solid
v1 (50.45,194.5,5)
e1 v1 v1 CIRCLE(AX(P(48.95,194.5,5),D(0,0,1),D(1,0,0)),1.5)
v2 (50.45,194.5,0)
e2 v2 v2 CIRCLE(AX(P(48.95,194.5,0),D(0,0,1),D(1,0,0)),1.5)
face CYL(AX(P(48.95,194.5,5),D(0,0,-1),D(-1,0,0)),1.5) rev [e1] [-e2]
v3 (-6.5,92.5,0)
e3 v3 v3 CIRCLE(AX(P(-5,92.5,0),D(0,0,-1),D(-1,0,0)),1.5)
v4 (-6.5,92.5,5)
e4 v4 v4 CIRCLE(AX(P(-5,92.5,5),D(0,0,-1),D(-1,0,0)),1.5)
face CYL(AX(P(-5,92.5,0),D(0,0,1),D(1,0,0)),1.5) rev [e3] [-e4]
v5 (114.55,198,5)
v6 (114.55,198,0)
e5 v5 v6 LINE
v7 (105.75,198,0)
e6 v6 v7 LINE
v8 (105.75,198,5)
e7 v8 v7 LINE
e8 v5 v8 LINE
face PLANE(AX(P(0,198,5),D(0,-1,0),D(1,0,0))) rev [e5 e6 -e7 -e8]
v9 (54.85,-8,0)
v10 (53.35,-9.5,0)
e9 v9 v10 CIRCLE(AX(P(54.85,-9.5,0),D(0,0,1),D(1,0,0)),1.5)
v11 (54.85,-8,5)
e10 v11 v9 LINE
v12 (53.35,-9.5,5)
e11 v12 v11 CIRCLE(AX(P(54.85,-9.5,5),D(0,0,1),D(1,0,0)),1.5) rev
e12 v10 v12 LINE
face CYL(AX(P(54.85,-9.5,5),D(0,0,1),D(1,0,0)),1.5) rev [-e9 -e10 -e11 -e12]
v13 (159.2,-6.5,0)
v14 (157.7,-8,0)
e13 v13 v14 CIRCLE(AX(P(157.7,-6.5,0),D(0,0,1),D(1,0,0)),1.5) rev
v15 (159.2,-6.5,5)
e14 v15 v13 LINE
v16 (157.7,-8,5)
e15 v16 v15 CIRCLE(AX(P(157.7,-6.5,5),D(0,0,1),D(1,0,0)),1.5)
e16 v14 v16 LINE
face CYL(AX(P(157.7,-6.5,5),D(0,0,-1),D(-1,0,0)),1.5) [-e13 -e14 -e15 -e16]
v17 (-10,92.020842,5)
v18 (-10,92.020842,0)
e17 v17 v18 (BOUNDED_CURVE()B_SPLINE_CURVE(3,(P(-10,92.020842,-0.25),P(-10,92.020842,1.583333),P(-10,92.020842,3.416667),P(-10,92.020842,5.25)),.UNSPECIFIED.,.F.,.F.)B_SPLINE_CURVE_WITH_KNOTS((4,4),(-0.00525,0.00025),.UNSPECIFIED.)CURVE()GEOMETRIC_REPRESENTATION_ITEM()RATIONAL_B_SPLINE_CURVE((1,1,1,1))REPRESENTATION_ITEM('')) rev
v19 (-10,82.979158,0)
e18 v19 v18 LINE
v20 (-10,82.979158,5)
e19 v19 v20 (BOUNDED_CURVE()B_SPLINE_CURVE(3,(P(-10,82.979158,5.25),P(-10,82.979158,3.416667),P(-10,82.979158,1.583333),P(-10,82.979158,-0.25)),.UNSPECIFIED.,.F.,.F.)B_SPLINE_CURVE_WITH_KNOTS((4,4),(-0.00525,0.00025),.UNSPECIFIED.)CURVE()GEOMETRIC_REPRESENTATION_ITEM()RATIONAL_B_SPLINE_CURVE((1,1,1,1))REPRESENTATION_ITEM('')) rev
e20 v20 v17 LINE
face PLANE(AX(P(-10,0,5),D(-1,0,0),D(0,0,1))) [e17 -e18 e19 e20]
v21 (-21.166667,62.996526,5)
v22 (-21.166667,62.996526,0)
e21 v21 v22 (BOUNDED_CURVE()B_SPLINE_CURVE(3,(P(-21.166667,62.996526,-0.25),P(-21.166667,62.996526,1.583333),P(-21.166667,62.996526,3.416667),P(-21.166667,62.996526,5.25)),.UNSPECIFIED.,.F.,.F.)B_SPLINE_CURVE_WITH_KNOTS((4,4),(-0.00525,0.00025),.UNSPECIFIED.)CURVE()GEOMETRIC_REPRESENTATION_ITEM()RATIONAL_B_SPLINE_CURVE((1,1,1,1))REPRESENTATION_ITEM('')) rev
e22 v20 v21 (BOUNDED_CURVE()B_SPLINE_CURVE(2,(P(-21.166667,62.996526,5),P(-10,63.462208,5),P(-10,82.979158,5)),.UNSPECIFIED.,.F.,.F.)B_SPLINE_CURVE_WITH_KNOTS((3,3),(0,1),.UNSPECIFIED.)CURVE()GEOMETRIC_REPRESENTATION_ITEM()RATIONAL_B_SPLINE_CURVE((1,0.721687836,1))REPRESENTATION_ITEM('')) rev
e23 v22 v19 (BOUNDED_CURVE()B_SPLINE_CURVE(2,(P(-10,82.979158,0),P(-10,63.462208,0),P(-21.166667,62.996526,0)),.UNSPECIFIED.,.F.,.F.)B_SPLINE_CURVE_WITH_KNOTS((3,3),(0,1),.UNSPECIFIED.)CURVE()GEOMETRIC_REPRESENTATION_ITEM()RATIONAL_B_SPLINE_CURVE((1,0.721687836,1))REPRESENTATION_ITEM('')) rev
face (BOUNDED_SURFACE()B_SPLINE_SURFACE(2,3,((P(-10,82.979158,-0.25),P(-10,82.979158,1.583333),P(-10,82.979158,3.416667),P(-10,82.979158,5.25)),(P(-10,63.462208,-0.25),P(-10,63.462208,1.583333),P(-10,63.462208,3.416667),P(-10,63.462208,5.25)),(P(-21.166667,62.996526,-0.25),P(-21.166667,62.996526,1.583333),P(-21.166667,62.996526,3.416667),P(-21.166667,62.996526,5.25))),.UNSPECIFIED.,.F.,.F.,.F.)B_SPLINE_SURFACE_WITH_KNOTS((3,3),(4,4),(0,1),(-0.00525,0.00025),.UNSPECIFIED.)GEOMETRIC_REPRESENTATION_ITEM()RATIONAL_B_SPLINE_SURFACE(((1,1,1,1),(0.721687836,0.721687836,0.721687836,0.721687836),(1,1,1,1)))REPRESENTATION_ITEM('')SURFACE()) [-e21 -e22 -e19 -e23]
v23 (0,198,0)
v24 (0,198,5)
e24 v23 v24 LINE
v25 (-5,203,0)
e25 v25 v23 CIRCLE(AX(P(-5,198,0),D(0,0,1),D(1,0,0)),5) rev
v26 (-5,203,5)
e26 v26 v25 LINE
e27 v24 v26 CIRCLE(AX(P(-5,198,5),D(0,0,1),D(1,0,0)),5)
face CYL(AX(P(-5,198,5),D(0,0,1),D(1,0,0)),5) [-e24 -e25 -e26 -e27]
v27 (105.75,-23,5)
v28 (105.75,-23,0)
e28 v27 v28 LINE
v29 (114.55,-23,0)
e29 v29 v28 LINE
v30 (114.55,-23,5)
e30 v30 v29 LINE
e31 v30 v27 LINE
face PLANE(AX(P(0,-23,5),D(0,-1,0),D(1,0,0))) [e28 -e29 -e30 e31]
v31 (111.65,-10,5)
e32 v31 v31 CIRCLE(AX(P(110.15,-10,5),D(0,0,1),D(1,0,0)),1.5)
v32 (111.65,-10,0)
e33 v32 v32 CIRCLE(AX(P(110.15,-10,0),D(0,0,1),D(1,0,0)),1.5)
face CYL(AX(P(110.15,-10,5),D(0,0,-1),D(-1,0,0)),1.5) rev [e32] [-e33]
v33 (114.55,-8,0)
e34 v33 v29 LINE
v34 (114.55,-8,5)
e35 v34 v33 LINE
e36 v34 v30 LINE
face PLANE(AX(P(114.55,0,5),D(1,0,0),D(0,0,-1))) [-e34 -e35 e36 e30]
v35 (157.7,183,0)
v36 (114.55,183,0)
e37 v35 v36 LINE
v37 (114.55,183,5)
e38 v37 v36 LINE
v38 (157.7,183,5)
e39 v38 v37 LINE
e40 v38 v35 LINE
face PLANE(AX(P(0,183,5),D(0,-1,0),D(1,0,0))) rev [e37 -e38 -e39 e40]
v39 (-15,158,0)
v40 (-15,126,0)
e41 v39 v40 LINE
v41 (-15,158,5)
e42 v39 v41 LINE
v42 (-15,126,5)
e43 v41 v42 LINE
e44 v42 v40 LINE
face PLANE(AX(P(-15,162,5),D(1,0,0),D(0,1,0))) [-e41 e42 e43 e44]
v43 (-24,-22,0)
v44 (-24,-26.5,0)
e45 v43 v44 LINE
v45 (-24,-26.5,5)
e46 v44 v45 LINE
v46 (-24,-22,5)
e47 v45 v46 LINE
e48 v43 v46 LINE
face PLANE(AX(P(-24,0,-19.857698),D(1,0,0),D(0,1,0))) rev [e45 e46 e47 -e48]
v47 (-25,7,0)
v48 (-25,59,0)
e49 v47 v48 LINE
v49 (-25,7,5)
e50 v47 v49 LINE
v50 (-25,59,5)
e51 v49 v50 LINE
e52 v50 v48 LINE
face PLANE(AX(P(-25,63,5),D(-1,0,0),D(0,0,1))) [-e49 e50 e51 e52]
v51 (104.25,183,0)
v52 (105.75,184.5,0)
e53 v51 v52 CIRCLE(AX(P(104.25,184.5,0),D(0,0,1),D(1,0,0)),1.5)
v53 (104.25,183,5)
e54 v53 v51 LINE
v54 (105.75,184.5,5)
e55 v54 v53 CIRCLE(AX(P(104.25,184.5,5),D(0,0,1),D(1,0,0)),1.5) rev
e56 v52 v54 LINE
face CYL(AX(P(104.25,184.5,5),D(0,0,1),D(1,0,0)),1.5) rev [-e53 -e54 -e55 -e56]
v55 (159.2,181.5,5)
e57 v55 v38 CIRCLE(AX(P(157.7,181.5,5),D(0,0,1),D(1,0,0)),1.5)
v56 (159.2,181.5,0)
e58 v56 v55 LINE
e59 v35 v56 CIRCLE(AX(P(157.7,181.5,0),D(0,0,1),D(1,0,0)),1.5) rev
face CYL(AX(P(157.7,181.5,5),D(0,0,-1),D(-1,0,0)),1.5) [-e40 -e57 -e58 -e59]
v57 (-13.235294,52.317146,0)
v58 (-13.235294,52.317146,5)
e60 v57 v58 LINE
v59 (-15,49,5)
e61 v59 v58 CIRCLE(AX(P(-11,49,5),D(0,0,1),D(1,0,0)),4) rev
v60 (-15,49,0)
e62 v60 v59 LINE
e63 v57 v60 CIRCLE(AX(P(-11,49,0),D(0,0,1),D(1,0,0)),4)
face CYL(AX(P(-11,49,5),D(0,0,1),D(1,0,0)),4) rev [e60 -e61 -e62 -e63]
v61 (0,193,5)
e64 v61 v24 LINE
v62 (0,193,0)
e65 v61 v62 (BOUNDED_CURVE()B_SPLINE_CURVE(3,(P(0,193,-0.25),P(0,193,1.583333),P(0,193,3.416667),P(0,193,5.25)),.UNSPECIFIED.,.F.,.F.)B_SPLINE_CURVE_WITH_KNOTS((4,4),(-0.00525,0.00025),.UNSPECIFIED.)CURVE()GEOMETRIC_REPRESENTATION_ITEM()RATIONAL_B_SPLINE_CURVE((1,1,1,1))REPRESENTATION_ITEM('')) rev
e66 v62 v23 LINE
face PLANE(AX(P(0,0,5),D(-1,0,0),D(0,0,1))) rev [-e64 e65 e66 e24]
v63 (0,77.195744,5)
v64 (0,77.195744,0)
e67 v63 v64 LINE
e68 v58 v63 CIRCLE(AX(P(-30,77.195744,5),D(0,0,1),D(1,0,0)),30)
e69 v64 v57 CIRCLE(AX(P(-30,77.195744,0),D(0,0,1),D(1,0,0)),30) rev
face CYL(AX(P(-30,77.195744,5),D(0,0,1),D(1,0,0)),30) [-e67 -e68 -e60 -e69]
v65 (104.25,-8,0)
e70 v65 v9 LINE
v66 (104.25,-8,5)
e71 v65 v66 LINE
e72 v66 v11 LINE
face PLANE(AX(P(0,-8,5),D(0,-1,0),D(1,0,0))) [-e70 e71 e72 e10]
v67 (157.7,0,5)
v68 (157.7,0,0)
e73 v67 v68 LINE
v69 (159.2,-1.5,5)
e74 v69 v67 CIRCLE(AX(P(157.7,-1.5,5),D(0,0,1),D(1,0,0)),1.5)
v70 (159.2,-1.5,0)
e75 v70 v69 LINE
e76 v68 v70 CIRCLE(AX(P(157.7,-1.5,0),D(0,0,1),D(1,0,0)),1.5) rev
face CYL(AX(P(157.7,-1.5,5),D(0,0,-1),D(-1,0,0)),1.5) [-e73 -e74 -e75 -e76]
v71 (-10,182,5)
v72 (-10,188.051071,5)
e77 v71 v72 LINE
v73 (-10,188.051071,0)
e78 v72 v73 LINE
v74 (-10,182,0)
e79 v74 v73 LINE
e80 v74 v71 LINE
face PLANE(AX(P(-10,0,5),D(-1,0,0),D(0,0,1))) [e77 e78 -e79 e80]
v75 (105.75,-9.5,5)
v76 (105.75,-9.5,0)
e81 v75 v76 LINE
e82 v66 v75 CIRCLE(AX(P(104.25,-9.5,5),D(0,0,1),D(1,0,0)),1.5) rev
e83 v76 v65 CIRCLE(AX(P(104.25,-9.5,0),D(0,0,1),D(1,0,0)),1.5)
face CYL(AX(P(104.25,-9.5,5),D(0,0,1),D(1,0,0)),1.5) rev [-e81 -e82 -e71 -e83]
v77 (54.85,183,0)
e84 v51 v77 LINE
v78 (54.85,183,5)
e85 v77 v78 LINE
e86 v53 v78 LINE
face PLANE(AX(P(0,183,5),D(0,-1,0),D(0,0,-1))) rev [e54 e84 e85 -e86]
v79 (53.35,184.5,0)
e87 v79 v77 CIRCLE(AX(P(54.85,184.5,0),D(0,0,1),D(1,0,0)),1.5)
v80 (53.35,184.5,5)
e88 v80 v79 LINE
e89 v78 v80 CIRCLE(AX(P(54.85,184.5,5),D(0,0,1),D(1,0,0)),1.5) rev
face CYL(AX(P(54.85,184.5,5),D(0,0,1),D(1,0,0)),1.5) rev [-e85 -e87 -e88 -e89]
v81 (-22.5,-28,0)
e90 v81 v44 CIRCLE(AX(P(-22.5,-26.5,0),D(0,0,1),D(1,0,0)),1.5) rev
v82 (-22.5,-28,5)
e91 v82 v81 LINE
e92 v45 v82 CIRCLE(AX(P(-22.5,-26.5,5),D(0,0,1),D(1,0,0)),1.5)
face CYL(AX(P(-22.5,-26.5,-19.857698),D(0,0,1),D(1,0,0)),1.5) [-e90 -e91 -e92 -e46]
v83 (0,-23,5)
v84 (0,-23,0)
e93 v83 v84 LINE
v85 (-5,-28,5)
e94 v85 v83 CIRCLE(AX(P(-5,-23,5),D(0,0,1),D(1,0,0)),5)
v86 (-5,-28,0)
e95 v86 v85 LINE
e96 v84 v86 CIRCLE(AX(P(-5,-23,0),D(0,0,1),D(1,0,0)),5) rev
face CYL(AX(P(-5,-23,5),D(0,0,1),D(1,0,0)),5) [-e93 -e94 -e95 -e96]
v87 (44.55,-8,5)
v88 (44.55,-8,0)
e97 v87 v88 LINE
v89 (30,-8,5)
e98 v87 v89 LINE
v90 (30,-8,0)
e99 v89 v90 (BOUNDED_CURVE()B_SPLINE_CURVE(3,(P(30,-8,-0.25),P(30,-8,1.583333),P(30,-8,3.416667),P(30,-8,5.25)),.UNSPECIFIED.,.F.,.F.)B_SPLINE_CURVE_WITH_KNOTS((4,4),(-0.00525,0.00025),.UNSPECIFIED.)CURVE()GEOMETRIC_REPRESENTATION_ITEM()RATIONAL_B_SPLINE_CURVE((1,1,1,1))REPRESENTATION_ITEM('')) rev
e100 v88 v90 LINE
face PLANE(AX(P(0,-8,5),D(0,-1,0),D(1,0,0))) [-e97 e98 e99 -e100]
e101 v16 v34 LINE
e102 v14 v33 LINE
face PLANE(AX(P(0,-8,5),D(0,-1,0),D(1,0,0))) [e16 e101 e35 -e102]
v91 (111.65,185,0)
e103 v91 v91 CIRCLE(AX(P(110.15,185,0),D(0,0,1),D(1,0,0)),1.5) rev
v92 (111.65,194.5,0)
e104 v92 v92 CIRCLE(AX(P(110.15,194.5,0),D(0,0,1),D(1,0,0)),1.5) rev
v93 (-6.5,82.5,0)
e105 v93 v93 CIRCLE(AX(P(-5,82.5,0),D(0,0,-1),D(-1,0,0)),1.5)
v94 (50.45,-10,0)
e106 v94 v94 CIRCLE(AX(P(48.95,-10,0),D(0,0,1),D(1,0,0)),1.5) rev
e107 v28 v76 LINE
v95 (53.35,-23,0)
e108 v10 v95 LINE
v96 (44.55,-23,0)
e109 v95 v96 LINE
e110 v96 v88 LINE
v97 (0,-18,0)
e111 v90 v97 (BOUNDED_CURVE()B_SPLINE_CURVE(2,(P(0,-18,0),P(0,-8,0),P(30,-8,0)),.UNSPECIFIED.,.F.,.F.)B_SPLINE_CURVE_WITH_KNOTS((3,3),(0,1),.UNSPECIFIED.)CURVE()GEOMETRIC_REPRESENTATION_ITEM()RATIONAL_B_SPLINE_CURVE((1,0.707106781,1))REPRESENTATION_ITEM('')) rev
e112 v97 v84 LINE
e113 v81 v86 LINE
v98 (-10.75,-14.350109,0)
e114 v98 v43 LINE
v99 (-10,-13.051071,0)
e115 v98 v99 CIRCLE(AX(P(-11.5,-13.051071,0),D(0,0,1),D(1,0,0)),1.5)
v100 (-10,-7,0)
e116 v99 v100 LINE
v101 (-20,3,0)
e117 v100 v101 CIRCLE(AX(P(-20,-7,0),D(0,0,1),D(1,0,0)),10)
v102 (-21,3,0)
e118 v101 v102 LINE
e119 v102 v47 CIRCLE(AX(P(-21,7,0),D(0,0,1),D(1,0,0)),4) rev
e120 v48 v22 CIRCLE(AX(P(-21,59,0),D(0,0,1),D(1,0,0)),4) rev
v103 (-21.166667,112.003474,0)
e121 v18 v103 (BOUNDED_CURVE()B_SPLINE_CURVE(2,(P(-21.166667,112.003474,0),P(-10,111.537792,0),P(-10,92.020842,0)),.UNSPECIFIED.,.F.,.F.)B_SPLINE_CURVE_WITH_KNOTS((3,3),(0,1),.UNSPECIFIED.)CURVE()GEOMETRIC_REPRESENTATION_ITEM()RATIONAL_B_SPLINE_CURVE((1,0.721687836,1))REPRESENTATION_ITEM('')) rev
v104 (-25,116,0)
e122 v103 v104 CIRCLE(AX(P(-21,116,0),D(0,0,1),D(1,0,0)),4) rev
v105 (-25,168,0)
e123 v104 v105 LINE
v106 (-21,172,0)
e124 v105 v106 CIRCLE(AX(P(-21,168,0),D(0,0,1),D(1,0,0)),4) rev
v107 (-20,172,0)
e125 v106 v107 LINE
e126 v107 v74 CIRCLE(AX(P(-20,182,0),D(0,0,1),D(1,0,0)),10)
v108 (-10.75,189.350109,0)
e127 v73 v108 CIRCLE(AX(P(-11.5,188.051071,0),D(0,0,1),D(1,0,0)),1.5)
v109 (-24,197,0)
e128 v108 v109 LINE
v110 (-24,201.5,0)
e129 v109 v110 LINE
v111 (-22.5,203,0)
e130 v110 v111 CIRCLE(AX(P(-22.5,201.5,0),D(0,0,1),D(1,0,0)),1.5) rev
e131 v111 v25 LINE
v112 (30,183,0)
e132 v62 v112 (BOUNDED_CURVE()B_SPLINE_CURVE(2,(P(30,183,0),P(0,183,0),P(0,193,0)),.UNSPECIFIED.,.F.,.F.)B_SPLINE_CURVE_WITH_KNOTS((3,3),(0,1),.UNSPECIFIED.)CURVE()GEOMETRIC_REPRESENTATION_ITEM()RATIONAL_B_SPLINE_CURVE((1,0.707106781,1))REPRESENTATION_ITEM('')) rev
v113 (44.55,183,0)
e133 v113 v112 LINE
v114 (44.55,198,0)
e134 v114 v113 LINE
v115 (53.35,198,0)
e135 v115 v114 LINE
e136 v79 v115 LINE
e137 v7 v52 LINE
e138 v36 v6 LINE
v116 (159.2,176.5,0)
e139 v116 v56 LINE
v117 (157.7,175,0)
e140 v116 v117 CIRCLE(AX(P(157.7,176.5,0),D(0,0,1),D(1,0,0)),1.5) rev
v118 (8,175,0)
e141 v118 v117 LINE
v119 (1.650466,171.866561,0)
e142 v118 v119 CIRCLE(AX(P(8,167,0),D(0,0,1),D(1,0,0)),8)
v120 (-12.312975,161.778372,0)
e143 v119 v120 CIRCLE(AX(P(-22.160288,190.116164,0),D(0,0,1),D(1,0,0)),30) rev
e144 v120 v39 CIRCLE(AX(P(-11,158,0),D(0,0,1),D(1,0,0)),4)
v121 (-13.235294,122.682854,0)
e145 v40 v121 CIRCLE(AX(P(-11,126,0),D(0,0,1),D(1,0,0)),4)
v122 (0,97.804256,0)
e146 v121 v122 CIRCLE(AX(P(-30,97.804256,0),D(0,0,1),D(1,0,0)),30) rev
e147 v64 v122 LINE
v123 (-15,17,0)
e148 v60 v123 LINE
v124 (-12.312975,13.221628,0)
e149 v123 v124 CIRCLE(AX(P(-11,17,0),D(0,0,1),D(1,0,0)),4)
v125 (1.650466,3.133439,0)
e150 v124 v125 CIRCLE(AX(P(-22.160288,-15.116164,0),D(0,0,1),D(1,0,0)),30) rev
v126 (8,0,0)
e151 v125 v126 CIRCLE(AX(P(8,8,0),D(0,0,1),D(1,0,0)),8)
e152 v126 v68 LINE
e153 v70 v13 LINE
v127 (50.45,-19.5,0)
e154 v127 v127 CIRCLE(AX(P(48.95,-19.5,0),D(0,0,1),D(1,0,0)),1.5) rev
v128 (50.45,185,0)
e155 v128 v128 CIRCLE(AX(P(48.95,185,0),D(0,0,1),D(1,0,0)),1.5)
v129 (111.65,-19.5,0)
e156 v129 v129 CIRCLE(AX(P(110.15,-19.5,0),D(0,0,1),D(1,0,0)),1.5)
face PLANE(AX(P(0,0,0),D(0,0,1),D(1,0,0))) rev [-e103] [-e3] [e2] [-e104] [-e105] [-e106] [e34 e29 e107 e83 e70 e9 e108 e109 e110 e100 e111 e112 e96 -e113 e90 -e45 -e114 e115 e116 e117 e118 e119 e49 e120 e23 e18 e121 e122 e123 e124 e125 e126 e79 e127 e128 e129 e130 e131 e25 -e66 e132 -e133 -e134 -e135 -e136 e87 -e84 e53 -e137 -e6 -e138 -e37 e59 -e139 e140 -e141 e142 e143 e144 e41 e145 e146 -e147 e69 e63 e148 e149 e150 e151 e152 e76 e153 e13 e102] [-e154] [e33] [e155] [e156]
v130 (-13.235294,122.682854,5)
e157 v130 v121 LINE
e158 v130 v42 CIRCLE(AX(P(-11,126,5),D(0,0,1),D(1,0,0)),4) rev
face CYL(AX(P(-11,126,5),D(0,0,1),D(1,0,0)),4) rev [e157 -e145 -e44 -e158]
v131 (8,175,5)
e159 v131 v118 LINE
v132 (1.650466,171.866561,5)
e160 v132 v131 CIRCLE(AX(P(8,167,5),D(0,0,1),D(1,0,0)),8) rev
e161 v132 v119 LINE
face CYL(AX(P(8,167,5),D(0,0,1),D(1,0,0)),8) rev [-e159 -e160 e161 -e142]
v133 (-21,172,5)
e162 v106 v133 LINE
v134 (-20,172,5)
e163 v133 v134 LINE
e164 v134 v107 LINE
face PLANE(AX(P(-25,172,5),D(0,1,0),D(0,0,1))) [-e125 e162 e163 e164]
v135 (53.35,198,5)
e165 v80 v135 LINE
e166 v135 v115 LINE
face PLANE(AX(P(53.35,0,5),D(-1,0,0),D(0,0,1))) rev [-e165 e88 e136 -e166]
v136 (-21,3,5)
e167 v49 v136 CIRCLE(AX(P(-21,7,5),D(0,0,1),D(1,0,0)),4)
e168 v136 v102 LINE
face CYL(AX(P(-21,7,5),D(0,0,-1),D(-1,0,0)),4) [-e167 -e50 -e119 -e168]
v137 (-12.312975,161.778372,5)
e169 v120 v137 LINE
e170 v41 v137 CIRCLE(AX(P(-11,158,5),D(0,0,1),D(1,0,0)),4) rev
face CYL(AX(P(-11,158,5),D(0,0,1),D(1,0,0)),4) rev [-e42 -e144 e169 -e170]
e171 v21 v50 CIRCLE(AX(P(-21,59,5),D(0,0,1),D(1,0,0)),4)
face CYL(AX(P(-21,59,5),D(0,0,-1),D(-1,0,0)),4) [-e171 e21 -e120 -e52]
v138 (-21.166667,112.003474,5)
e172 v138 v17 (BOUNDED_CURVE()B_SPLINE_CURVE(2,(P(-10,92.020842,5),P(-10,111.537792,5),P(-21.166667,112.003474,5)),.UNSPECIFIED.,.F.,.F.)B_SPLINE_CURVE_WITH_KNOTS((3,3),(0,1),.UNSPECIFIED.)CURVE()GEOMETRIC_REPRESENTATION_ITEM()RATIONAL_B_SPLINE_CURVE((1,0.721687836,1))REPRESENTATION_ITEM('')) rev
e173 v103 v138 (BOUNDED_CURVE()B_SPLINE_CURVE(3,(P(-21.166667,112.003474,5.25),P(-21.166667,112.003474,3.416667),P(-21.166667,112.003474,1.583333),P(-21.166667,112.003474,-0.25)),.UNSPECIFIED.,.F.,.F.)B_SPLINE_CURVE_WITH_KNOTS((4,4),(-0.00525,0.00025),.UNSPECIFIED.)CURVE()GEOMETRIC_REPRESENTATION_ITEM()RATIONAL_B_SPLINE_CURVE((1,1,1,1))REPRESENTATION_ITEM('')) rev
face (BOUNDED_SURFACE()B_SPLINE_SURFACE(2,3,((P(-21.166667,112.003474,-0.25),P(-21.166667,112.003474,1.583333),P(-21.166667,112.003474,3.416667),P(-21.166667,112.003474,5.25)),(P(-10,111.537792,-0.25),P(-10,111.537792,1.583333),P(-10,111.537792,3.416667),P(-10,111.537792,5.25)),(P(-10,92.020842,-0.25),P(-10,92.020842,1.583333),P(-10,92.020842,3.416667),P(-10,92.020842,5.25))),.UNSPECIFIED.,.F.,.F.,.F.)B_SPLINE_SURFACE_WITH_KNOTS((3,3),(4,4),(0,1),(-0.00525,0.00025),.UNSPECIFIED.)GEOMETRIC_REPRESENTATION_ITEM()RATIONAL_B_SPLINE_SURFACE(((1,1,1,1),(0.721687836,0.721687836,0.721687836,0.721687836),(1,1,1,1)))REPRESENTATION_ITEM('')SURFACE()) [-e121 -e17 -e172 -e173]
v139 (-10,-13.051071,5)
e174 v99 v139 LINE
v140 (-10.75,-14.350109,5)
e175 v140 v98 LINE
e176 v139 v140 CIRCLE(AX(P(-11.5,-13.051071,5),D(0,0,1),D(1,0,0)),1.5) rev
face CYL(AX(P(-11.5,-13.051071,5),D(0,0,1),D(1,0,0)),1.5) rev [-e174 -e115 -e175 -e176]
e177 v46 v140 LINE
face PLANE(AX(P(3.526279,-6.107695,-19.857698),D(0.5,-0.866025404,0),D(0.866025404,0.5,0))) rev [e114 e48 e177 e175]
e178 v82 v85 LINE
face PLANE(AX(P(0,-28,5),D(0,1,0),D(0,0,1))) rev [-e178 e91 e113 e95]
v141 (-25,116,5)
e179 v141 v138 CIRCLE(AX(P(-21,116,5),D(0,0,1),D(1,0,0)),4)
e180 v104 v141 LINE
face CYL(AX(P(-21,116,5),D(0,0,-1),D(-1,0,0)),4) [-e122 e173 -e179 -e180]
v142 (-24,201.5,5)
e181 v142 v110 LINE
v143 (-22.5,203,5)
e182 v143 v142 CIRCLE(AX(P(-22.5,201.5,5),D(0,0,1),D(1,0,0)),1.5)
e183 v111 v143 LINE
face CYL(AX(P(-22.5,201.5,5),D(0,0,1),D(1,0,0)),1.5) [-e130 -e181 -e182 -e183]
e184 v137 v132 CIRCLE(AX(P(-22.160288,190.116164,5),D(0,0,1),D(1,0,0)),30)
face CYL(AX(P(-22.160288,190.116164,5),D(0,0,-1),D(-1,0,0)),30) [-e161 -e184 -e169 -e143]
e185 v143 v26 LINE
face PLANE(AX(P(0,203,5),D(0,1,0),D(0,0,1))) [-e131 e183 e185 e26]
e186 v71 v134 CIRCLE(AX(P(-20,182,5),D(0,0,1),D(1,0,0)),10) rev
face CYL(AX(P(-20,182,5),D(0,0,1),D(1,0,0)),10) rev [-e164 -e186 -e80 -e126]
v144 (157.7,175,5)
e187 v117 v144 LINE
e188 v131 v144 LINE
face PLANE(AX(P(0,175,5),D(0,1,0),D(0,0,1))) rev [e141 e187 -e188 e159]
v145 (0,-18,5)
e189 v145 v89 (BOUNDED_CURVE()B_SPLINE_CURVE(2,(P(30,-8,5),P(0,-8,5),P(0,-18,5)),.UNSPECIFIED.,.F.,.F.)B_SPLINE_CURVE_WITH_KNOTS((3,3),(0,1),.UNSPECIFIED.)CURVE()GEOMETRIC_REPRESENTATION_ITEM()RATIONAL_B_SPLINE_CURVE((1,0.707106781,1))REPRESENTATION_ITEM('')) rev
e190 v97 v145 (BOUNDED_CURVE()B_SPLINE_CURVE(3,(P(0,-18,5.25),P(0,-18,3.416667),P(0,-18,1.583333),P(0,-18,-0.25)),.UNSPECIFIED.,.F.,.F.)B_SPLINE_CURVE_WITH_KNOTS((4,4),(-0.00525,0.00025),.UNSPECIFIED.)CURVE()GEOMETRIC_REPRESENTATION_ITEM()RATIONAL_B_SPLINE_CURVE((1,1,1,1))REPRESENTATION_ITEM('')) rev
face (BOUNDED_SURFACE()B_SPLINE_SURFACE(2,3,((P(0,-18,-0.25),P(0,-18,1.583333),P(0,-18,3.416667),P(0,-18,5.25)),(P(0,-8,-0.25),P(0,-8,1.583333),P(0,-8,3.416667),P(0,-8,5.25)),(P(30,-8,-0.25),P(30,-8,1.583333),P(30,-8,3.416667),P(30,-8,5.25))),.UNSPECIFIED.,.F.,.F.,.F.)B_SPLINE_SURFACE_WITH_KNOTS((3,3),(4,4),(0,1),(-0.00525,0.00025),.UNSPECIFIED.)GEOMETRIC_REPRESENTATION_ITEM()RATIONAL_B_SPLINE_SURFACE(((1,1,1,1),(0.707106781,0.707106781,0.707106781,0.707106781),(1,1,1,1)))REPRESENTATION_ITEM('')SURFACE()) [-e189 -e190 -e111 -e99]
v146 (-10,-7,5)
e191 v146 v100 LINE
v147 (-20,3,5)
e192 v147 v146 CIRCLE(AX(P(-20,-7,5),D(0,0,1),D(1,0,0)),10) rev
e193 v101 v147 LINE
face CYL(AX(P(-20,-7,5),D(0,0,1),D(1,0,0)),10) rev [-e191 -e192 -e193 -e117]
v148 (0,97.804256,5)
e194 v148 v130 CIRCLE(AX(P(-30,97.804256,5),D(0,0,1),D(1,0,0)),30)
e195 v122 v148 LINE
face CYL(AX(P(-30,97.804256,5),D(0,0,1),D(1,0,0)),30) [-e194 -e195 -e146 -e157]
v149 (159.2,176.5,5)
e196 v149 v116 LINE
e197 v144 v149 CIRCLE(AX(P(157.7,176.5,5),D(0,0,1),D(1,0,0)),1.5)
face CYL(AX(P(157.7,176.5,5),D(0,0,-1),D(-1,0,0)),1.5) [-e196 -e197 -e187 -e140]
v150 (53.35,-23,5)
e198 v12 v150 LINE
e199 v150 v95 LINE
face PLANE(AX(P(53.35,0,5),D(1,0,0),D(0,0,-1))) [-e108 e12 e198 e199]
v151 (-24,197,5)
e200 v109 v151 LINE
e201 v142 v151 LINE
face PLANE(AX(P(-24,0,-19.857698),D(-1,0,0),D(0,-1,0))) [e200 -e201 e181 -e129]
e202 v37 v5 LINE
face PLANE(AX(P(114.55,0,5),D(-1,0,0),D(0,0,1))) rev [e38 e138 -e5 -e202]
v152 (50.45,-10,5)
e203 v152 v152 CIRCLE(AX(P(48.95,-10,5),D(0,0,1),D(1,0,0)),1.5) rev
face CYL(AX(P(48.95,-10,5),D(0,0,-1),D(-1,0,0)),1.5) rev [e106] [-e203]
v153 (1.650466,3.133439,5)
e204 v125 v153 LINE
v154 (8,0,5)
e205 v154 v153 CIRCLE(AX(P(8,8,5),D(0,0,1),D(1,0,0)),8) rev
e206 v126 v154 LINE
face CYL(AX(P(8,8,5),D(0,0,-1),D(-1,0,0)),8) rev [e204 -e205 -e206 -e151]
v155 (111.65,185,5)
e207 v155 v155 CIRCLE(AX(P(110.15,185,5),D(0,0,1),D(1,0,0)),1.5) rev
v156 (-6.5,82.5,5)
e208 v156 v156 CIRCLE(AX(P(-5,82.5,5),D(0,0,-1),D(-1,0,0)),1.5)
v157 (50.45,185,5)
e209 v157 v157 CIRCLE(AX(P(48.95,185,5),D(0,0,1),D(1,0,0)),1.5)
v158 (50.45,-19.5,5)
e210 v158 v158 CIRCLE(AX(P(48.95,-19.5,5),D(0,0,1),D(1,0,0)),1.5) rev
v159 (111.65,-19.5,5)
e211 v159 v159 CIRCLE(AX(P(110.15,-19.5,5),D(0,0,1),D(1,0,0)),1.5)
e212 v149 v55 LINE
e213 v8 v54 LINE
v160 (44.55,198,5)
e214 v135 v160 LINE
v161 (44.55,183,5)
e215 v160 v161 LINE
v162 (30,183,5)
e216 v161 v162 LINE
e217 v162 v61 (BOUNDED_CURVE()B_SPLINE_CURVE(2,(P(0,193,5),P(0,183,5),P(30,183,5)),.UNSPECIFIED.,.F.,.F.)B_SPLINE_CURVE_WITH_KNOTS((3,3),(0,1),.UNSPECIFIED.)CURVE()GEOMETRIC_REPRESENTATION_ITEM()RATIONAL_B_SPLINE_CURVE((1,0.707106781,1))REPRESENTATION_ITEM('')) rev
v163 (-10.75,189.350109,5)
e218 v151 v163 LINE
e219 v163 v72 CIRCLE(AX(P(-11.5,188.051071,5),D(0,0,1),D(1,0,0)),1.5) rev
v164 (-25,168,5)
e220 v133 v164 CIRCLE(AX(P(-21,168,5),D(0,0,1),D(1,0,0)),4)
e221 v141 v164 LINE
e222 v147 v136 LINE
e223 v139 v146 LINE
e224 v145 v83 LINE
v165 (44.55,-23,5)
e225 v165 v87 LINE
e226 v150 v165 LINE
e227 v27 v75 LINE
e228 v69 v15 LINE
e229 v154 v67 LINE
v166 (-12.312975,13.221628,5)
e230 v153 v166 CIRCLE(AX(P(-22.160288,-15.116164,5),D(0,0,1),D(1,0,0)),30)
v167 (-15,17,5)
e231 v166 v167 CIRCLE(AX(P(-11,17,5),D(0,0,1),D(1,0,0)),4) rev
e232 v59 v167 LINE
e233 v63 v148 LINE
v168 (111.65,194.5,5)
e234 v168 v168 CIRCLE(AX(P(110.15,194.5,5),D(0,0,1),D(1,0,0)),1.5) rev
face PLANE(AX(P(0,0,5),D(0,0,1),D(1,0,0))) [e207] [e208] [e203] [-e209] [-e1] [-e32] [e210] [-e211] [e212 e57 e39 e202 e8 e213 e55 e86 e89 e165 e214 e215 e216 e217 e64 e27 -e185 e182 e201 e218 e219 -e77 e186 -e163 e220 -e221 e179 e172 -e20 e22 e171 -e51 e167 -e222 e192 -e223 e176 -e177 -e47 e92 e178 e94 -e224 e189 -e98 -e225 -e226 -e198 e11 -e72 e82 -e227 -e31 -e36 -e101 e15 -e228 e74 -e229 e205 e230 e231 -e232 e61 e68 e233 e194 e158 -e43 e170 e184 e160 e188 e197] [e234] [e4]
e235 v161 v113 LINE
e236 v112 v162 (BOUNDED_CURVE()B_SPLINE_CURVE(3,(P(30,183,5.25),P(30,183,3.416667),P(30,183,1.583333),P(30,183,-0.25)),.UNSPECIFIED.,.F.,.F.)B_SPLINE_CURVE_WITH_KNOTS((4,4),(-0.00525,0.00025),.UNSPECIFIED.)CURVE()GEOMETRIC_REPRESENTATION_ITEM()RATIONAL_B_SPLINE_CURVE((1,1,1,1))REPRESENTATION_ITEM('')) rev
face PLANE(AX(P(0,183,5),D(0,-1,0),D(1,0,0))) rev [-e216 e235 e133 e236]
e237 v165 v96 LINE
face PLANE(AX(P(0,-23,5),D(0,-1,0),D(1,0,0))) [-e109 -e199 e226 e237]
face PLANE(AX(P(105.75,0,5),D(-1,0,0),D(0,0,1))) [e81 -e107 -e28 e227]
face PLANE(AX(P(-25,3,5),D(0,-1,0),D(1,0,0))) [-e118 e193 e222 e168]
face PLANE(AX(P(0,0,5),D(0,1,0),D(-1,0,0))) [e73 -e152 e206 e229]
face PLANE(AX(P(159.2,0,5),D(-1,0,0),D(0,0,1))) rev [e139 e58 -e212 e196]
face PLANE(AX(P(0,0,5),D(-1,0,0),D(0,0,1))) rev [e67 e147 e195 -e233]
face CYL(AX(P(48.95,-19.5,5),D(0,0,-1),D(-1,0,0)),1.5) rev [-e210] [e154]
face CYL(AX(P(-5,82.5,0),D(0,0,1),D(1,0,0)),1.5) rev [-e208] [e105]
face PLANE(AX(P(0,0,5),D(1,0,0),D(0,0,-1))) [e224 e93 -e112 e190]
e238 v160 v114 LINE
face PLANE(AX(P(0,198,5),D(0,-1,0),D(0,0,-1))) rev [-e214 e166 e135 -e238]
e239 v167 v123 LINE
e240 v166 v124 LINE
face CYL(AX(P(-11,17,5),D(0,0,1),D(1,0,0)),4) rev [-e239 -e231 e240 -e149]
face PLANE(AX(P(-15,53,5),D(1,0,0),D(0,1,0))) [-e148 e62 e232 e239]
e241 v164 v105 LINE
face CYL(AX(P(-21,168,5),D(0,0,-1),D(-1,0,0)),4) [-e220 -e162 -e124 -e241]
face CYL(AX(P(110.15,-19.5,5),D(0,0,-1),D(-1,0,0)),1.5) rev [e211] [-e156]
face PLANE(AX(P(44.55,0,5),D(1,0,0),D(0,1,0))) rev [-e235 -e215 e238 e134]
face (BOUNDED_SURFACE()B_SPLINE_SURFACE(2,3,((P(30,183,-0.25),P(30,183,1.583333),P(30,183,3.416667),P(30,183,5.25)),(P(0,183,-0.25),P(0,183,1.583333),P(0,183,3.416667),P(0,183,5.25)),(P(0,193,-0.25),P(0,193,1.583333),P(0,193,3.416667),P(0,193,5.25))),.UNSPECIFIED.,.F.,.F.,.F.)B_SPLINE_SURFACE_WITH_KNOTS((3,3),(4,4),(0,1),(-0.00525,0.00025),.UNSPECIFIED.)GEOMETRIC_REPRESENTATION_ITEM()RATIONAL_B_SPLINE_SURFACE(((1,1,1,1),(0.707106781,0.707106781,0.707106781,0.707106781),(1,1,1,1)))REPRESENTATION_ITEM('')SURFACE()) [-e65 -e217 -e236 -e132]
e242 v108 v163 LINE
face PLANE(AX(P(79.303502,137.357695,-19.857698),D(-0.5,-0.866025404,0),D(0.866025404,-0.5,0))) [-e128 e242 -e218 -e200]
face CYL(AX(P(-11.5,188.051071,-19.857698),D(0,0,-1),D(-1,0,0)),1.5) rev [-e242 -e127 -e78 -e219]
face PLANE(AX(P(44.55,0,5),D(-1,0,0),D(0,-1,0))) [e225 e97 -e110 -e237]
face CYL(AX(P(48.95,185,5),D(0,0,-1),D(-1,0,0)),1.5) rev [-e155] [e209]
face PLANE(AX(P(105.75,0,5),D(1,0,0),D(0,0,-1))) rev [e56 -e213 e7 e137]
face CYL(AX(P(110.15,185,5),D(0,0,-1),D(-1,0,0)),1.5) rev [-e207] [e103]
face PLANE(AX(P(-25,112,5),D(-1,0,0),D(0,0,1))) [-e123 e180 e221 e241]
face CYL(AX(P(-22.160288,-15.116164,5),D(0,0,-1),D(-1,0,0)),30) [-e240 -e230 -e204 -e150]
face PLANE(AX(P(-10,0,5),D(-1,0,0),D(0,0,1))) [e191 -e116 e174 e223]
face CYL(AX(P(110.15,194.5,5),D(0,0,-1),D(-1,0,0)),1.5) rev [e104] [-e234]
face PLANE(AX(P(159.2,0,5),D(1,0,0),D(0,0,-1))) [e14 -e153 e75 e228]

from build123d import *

# Parameters (mm, degrees)
SKETCH_1_R          = 1.5
SKETCH_1_W          = 10
SKETCH_1_H          = 20
EXTRUDE_1_DEPTH     = 5
FILLET_1_R          = 1.5
FILLET_2_R          = 8
EXTRUDE_5_DEPTH     = 5
SKETCH_7_R          = 1.5
CUT_EXTRUDE_1_DEPTH = 259.028370533
FILLET_5_R          = 1.5
EXTRUDE_6_DEPTH     = 5
SKETCH_9_W          = 10
SKETCH_9_H          = 40
CUT_EXTRUDE_2_DEPTH = 259.028370533
FILLET_6_R          = 4
FILLET_8_R          = 10
FILLET_9_R          = 10
FILLET_10_DEPTH     = 5
FILLET_11_DEPTH     = 5
FILLET_13_SIZE      = 10
FILLET_13_SIZE_2    = 30
FILLET_14_SIZE      = 30
FILLET_14_SIZE_2    = 10
FILLET_15_R         = 5
FILLET_16_R         = 30
FILLET_17_R         = 30
FILLET_18_R         = 30


with BuildPart() as part:
    # 草图1 → 凸台-拉伸1 (new body)
    # profile 1 of 3: a face of its own
    with BuildSketch(Plane.XY):
        Polygon((105.75, 0), (114.65, 0), (159.2, 0), (159.2, -8), (114.55, -8), (114.55, -23), (105.75, -23), (105.75, -8), (53.35, -8), (53.35, -23), (44.55, -23), (44.55, -8), (-10, -8), (-10, 183), (44.55, 183), (44.55, 198), (53.35, 198), (53.35, 183), (105.75, 183), (105.75, 198), (114.55, 198), (114.55, 183), (159.2, 183), (159.2, 175), (114.65, 175), (105.75, 175), (53.35, 175), (44.55, 175), (0, 175), (0, 0), (44.55, 0), (53.35, 0), align=None)
        with Locations((48.95, -10)):
            Circle(SKETCH_1_R, mode=Mode.SUBTRACT)
        with Locations((110.15, -19.5)):
            Circle(SKETCH_1_R, mode=Mode.SUBTRACT)
        with Locations((110.15, -10)):
            Circle(SKETCH_1_R, mode=Mode.SUBTRACT)
        with Locations((110.15, 194.5)):
            Circle(SKETCH_1_R, mode=Mode.SUBTRACT)
        with Locations((48.95, 194.5)):
            Circle(SKETCH_1_R, mode=Mode.SUBTRACT)
        with Locations((48.95, 185)):
            Circle(SKETCH_1_R, mode=Mode.SUBTRACT)
        with Locations((110.15, 185)):
            Circle(SKETCH_1_R, mode=Mode.SUBTRACT)
        with Locations((48.95, -19.5)):
            Circle(SKETCH_1_R, mode=Mode.SUBTRACT)
    # profile 2 of 3: a face of its own
    with BuildSketch(Plane.XY):
        with Locations((-5, 193)):
            Rectangle(SKETCH_1_W, SKETCH_1_H)
    # profile 3 of 3: a face of its own
    with BuildSketch(Plane.XY):
        with Locations((-5, -18)):
            Rectangle(SKETCH_1_W, SKETCH_1_H)
    extrude(amount=EXTRUDE_1_DEPTH)

    # 圆角1
    fillet_1_edges = [part.edges().sort_by_distance(p)[0] for p in [
        (159.2, 0, 2.5),
        (159.2, -8, 2.5),
        (105.75, -8, 2.5),
        (53.35, -8, 2.5),
        (53.35, 183, 2.5),
        (105.75, 183, 2.5),
        (159.2, 183, 2.5),
        (159.2, 175, 2.5),
    ]]
    fillet(fillet_1_edges, radius=FILLET_1_R)

    # 圆角2
    fillet_2_edges = [part.edges().sort_by_distance(p)[0] for p in [
        (0, 175, 2.5),
        (0, 0, 2.5),
    ]]
    fillet(fillet_2_edges, radius=FILLET_2_R)

    # 草图6 → 凸台-拉伸5 (add)
    with BuildSketch(Plane.XY.offset(5)):
        Polygon((-24, 197), (-10, 188.917096231), (-10, 203), (-24, 203), align=None)
        Polygon((-10, -28), (-24, -28), (-24, -22), (-10, -13.917096231), align=None)
    extrude(amount=-EXTRUDE_5_DEPTH)

    # 草图7 → 切除-拉伸1 (cut, through all)
    with BuildSketch(Plane(origin=(0, 0, 5), x_dir=(-1, 0, 0), z_dir=(0, 0, -1))):
        with Locations((5, 92.5)):
            Circle(SKETCH_7_R)
        with Locations((5, 82.5)):
            Circle(SKETCH_7_R)
    extrude(amount=CUT_EXTRUDE_1_DEPTH, mode=Mode.SUBTRACT)

    # 圆角5
    fillet_5_edges = [part.edges().sort_by_distance(p)[0] for p in [
        (-24, 203, 2.5),
        (-10, 188.917096231, 2.5),
        (-10, -13.917096231, 2.5),
        (-24, -28, 2.5),
    ]]
    fillet(fillet_5_edges, radius=FILLET_5_R)

    # 草图8 → 凸台-拉伸6 (add, through all)
    with BuildSketch(Plane(origin=(0, 0, 0), x_dir=(-1, 0, 0), z_dir=(0, 0, -1))):
        Polygon((25, 112), (10, 112), (10, 122), (15, 122), (15, 162), (10, 162), (10, 172), (25, 172), align=None)
        Polygon((15, 53), (10, 53), (10, 63), (25, 63), (25, 3), (10, 3), (10, 13), (15, 13), align=None)
    extrude(amount=-EXTRUDE_6_DEPTH)

    # 草图9 → 切除-拉伸2 (cut, through all)
    with BuildSketch(Plane(origin=(0, 0, 0), x_dir=(-1, 0, 0), z_dir=(0, 0, -1))):
        with Locations((5, 142)):
            Rectangle(SKETCH_9_W, SKETCH_9_H)
        with Locations((5, 33)):
            Rectangle(SKETCH_9_W, SKETCH_9_H)
    extrude(amount=-CUT_EXTRUDE_2_DEPTH, mode=Mode.SUBTRACT)

    # 圆角6
    fillet_6_edges = [part.edges().sort_by_distance(p)[0] for p in [
        (-25, 172, 2.5),
        (-25, 112, 2.5),
        (-15, 122, 2.5),
        (-15, 162, 2.5),
        (-25, 63, 2.5),
        (-25, 3, 2.5),
        (-15, 13, 2.5),
        (-15, 53, 2.5),
    ]]
    fillet(fillet_6_edges, radius=FILLET_6_R)

    # 圆角8
    fillet_8_edges = [part.edges().sort_by_distance(p)[0] for p in [
        (-10, 172, 2.5),
    ]]
    fillet(fillet_8_edges, radius=FILLET_8_R)

    # 圆角9
    fillet_9_edges = [part.edges().sort_by_distance(p)[0] for p in [
        (-10, 3, 2.5),
    ]]
    fillet(fillet_9_edges, radius=FILLET_9_R)

    # 圆角10: read off the stored shape, not the designer's step
    # 圆角10 outline → 圆角10 (add)
    with BuildSketch(Plane.XY):
        with BuildLine():
            Line((-10, 63), (-10, 82.979157617))
            add(Edge.make_bspline(
                [(-10, 82.979157617), (-10, 63.462208461), (-21.166666667, 62.996526269)],
                knots=[0, 0, 0, 1, 1, 1], degree=2, weights=[1, 0.721687836, 1]))
            ThreePointArc((-21.166666667, 62.996526269), (-21.083351432, 62.999131473), (-21, 63))
            Line((-21, 63), (-10, 63))
        make_face()
    extrude(amount=FILLET_10_DEPTH)

    # 圆角11: read off the stored shape, not the designer's step
    # 圆角11 outline → 圆角11 (add)
    with BuildSketch(Plane.XY):
        with BuildLine():
            ThreePointArc((-21, 112), (-21.083351432, 112.000868527), (-21.166666667, 112.003473731))
            add(Edge.make_bspline(
                [(-21.166666667, 112.003473731), (-10, 111.537791539), (-10, 92.020842383)],
                knots=[0, 0, 0, 1, 1, 1], degree=2, weights=[1, 0.721687836, 1]))
            Line((-10, 92.020842383), (-10, 112))
            Line((-10, 112), (-21, 112))
        make_face()
    extrude(amount=FILLET_11_DEPTH)

    # 圆角13
    # a fillet whose section is not a circle: 30, 10 mm, written as the material it adds along each edge
    with BuildSketch(Plane(origin=(0, 183, 0), x_dir=(0, 1, 0), z_dir=(0, 0, 1))) as fillet_13_piece_1:
        with BuildLine():
            Bezier((FILLET_13_SIZE, 0), (0, 0), (0, -FILLET_13_SIZE_2), weights=[1, 0.707106781, 1])
            Line((0, -FILLET_13_SIZE_2), (0, 0))
            Line((0, 0), (FILLET_13_SIZE, 0))
        make_face()
    extrude(amount=5)

    # 圆角14
    # a fillet whose section is not a circle: 30, 10 mm, written as the material it adds along each edge
    with BuildSketch(Plane(origin=(0, -8, 0), x_dir=(1, 0, 0), z_dir=(0, 0, 1))) as fillet_14_piece_1:
        with BuildLine():
            Bezier((FILLET_14_SIZE, 0), (0, 0), (0, -FILLET_14_SIZE_2), weights=[1, 0.707106781, 1])
            Line((0, -FILLET_14_SIZE_2), (0, 0))
            Line((0, 0), (FILLET_14_SIZE, 0))
        make_face()
    extrude(amount=5)

    # 圆角15
    fillet_15_edges = [part.edges().sort_by_distance(p)[0] for p in [
        (0, -28, 2.5),
        (0, 203, 2.5),
    ]]
    fillet(fillet_15_edges, radius=FILLET_15_R)

    # 圆角16
    fillet_16_edges = [part.edges().sort_by_distance(p)[0] for p in [
        (0, 162, 2.5),
    ]]
    fillet(fillet_16_edges, radius=FILLET_16_R)

    # 圆角17
    fillet_17_edges = [part.edges().sort_by_distance(p)[0] for p in [
        (0, 13, 2.5),
    ]]
    fillet(fillet_17_edges, radius=FILLET_17_R)

    # 圆角18
    fillet_18_edges = [part.edges().sort_by_distance(p)[0] for p in [
        (0, 53, 2.5),
        (0, 122, 2.5),
    ]]
    fillet(fillet_18_edges, radius=FILLET_18_R)


solid = part.part
